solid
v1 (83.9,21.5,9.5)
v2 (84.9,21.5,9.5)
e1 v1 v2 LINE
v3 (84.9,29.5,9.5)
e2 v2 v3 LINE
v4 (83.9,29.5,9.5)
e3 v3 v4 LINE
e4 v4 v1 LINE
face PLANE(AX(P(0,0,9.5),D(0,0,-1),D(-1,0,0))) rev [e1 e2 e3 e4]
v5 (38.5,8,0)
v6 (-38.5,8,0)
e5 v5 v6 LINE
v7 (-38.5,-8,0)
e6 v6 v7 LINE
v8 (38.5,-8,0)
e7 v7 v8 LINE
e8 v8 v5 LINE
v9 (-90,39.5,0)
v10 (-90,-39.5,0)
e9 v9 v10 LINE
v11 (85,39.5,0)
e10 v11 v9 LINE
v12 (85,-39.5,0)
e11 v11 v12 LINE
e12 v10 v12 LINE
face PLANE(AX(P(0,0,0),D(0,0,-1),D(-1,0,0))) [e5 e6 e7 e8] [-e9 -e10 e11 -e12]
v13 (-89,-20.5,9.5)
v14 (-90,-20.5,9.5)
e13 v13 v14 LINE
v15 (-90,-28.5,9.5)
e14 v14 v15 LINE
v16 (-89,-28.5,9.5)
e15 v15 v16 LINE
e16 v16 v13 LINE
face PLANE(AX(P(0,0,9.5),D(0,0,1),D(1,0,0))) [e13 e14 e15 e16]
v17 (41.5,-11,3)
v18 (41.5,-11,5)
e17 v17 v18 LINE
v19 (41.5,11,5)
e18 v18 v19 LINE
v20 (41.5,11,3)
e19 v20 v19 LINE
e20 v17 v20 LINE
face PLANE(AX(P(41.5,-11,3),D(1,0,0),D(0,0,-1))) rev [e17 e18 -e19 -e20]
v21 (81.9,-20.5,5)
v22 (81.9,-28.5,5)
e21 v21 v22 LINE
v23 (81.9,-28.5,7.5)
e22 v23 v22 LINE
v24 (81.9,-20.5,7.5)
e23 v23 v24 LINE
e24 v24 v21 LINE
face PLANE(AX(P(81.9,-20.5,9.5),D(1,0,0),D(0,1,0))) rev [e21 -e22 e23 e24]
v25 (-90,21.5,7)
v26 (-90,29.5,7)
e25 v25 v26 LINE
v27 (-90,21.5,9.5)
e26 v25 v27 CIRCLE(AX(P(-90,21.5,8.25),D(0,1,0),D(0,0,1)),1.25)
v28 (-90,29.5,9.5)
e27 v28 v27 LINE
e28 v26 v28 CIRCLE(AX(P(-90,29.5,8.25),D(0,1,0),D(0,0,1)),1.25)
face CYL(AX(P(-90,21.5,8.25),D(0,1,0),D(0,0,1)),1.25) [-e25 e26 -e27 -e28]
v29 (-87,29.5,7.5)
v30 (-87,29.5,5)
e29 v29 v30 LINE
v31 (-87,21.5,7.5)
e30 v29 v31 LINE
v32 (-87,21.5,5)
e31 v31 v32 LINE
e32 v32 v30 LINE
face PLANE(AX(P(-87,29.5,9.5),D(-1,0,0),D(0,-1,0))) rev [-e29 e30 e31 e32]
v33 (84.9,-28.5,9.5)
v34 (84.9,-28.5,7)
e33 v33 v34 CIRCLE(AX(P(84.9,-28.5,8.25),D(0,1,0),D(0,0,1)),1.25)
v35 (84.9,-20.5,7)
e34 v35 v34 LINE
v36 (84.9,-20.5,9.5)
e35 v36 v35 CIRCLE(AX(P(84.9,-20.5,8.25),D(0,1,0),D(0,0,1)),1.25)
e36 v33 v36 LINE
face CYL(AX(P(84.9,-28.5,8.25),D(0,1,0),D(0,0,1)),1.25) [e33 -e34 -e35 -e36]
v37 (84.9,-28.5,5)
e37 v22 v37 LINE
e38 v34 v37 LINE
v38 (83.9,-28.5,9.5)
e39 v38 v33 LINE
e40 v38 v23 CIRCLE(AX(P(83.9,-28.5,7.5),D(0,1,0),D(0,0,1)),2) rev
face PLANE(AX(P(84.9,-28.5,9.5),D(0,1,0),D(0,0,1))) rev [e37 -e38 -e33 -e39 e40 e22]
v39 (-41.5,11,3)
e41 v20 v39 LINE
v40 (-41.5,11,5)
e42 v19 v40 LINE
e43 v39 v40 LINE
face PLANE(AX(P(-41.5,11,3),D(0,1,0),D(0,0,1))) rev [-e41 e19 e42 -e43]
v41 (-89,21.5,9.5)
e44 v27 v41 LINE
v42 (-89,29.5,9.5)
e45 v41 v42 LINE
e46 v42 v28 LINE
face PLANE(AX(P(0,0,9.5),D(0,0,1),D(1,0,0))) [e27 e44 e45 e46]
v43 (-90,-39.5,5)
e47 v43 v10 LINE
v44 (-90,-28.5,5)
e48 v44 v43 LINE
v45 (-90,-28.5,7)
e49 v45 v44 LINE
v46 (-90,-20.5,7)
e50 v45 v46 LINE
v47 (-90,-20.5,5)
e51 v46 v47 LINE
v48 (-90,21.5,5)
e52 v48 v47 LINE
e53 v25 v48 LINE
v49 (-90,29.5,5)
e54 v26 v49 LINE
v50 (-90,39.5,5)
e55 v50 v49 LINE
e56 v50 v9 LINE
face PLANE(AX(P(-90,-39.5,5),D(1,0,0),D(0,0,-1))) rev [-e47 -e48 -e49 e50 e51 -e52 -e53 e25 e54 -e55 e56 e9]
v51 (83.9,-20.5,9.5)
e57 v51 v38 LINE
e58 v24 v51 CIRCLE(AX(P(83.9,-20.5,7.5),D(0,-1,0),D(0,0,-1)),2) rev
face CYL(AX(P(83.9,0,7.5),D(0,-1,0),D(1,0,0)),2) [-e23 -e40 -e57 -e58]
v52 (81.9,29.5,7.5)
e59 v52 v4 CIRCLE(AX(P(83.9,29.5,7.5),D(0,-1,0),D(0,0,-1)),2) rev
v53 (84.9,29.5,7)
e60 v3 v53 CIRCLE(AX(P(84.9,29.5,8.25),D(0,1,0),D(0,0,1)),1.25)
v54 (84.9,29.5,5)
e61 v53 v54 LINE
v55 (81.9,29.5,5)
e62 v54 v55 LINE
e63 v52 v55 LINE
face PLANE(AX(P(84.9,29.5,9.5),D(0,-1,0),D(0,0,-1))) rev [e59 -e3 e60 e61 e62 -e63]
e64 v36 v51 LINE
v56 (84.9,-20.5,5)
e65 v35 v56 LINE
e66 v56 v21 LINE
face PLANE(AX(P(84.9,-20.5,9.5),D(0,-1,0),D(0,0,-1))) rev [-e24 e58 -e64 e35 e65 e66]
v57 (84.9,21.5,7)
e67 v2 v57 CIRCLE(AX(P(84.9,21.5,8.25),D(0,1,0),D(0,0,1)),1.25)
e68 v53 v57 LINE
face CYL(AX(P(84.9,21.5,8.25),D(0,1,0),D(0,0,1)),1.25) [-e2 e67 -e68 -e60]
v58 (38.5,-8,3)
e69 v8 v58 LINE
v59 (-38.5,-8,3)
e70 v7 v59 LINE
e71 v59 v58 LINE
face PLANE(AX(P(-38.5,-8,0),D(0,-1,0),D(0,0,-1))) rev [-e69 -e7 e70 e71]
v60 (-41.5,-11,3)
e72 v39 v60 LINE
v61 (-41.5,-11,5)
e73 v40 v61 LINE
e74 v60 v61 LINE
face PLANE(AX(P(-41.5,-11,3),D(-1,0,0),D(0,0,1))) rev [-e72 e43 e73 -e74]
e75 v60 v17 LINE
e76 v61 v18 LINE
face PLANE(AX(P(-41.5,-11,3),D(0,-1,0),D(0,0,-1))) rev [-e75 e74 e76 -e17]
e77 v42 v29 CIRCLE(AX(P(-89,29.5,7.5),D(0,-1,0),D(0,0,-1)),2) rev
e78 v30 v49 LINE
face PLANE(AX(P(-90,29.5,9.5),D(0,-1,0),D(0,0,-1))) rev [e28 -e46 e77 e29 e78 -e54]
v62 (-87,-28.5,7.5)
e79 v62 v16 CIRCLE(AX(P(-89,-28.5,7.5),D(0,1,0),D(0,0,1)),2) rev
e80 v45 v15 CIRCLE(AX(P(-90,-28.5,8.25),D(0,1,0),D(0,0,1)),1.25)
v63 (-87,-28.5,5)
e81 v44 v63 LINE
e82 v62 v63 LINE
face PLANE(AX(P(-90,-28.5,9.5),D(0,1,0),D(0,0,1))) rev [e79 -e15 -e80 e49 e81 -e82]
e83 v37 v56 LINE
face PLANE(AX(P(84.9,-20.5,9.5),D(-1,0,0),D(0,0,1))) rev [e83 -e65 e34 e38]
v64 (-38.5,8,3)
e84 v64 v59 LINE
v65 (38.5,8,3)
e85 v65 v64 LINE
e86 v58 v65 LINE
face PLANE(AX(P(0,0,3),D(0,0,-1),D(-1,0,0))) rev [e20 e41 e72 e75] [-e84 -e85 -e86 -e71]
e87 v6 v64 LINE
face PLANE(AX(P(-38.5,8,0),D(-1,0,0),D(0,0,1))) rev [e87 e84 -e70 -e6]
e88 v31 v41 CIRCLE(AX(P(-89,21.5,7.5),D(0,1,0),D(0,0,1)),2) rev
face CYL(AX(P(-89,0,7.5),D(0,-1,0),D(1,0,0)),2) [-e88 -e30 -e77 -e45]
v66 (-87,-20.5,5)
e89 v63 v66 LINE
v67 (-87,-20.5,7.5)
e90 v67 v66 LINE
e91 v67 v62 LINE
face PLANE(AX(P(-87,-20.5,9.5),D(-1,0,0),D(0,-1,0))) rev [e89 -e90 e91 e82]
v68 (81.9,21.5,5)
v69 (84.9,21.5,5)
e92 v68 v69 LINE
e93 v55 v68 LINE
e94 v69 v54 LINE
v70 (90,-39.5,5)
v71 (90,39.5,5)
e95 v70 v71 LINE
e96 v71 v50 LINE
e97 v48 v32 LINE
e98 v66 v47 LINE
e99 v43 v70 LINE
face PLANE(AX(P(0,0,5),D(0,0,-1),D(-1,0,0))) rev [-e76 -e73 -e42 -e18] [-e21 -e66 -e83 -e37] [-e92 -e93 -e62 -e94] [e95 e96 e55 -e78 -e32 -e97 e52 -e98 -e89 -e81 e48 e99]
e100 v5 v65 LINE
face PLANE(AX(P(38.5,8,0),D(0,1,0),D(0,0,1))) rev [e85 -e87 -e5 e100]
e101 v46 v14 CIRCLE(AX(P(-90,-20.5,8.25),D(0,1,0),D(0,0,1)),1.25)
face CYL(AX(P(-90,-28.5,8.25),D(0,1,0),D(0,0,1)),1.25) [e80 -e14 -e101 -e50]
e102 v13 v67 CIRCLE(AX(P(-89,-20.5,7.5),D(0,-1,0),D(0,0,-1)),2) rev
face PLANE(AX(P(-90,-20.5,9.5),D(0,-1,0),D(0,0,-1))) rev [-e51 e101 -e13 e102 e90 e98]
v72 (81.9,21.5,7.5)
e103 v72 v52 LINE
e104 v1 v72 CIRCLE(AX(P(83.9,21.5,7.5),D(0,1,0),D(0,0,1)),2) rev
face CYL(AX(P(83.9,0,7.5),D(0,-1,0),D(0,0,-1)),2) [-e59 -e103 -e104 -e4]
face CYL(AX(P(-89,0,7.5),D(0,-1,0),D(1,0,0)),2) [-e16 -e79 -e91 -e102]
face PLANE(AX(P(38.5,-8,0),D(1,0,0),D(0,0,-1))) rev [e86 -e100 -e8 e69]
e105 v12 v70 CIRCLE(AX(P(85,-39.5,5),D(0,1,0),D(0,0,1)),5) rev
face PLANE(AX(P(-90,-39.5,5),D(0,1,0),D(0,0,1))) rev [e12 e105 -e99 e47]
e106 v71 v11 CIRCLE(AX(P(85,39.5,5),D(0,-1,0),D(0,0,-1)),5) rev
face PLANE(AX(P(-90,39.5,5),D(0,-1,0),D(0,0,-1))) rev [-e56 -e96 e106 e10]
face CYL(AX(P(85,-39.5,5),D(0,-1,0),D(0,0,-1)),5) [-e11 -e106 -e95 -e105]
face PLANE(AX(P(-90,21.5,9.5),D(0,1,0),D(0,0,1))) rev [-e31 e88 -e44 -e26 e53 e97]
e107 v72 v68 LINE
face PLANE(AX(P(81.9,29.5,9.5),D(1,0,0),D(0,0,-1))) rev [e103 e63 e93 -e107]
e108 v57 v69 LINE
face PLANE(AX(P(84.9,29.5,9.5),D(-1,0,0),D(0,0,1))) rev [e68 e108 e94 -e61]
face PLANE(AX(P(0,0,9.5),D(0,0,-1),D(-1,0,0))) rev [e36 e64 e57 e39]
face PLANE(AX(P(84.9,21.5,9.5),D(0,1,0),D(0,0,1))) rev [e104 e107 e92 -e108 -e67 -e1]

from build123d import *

# Parameters (mm, degrees)
SKETCH1_W            = 180
SKETCH1_H            = 79
BOSS_EXTRUDE1_DEPTH  = 5
FILLET1_R            = 5
SKETCH2_W            = 3
SKETCH2_H            = 8
BOSS_EXTRUDE2_DEPTH  = 4.5
FILLET2_R            = 2
SKETCH3_R            = 1.25
BOSS_EXTRUDE3_DEPTH  = 8
LPATTERN1_COUNT      = 2
LPATTERN1_PITCH      = 50
LPATTERN1_COUNT_DIR2 = 2
LPATTERN1_PITCH_DIR2 = 174.9
SKETCH4_W            = 83
SKETCH4_H            = 22
CUT_EXTRUDE1_DEPTH   = 2
SKETCH5_W            = 77
SKETCH5_H            = 16
CUT_EXTRUDE2_DEPTH   = 3


with BuildPart() as part:
    # Sketch1 → Boss-Extrude1 (new body)
    with BuildSketch(Plane.XY):
        Rectangle(SKETCH1_W, SKETCH1_H)
    extrude(amount=BOSS_EXTRUDE1_DEPTH)

    # Fillet1
    fillet1_edges = [part.edges().sort_by_distance(p)[0] for p in [
        (90, 0, 0),
    ]]
    fillet(fillet1_edges, radius=FILLET1_R - 0.0001)  # a hair under: the kernel refuses the full size

    # Sketch2 → Boss-Extrude2 (add)
    with BuildSketch(Plane.XY.offset(5)):
        with Locations((-88.5, -24.5)):
            Rectangle(SKETCH2_W, SKETCH2_H)
        with Locations((-88.5, 25.5)):
            Rectangle(SKETCH2_W, SKETCH2_H)
        with Locations((83.4, 25.5)):
            Rectangle(SKETCH2_W, SKETCH2_H)
        with Locations((83.4, -24.5)):
            Rectangle(SKETCH2_W, SKETCH2_H)
    extrude(amount=BOSS_EXTRUDE2_DEPTH)

    # Fillet2
    fillet2_edges = [part.edges().sort_by_distance(p)[0] for p in [
        (-87, -24.5, 9.5),
        (-87, 25.5, 9.5),
        (81.9, 25.5, 9.5),
        (81.9, -24.5, 9.5),
    ]]
    fillet(fillet2_edges, radius=FILLET2_R)

    # Sketch3 → Boss-Extrude3 (add)
    with BuildSketch(Plane(origin=(0, 29.5, 0), x_dir=(1, 0, 0), z_dir=(0, 1, 0))):
        with Locations((84.9, -8.25)):
            Circle(SKETCH3_R)
    boss_extrude3 = extrude(amount=-BOSS_EXTRUDE3_DEPTH)

    # LPattern1: Boss-Extrude3 2 × 2
    with Locations(*[(-j * LPATTERN1_PITCH_DIR2, -i * LPATTERN1_PITCH, 0) for i in range(LPATTERN1_COUNT) for j in range(LPATTERN1_COUNT_DIR2) if (i, j) != (0, 0)]):
        add(boss_extrude3)

    # Sketch4 → Cut-Extrude1 (cut)
    with BuildSketch(Plane.XY.offset(5)):
        Rectangle(SKETCH4_W, SKETCH4_H)
    extrude(amount=-CUT_EXTRUDE1_DEPTH, mode=Mode.SUBTRACT)

    # Sketch5 → Cut-Extrude2 (cut)
    with BuildSketch(Plane.XY.offset(3)):
        Rectangle(SKETCH5_W, SKETCH5_H)
    extrude(amount=-CUT_EXTRUDE2_DEPTH, mode=Mode.SUBTRACT)


solid = part.part
